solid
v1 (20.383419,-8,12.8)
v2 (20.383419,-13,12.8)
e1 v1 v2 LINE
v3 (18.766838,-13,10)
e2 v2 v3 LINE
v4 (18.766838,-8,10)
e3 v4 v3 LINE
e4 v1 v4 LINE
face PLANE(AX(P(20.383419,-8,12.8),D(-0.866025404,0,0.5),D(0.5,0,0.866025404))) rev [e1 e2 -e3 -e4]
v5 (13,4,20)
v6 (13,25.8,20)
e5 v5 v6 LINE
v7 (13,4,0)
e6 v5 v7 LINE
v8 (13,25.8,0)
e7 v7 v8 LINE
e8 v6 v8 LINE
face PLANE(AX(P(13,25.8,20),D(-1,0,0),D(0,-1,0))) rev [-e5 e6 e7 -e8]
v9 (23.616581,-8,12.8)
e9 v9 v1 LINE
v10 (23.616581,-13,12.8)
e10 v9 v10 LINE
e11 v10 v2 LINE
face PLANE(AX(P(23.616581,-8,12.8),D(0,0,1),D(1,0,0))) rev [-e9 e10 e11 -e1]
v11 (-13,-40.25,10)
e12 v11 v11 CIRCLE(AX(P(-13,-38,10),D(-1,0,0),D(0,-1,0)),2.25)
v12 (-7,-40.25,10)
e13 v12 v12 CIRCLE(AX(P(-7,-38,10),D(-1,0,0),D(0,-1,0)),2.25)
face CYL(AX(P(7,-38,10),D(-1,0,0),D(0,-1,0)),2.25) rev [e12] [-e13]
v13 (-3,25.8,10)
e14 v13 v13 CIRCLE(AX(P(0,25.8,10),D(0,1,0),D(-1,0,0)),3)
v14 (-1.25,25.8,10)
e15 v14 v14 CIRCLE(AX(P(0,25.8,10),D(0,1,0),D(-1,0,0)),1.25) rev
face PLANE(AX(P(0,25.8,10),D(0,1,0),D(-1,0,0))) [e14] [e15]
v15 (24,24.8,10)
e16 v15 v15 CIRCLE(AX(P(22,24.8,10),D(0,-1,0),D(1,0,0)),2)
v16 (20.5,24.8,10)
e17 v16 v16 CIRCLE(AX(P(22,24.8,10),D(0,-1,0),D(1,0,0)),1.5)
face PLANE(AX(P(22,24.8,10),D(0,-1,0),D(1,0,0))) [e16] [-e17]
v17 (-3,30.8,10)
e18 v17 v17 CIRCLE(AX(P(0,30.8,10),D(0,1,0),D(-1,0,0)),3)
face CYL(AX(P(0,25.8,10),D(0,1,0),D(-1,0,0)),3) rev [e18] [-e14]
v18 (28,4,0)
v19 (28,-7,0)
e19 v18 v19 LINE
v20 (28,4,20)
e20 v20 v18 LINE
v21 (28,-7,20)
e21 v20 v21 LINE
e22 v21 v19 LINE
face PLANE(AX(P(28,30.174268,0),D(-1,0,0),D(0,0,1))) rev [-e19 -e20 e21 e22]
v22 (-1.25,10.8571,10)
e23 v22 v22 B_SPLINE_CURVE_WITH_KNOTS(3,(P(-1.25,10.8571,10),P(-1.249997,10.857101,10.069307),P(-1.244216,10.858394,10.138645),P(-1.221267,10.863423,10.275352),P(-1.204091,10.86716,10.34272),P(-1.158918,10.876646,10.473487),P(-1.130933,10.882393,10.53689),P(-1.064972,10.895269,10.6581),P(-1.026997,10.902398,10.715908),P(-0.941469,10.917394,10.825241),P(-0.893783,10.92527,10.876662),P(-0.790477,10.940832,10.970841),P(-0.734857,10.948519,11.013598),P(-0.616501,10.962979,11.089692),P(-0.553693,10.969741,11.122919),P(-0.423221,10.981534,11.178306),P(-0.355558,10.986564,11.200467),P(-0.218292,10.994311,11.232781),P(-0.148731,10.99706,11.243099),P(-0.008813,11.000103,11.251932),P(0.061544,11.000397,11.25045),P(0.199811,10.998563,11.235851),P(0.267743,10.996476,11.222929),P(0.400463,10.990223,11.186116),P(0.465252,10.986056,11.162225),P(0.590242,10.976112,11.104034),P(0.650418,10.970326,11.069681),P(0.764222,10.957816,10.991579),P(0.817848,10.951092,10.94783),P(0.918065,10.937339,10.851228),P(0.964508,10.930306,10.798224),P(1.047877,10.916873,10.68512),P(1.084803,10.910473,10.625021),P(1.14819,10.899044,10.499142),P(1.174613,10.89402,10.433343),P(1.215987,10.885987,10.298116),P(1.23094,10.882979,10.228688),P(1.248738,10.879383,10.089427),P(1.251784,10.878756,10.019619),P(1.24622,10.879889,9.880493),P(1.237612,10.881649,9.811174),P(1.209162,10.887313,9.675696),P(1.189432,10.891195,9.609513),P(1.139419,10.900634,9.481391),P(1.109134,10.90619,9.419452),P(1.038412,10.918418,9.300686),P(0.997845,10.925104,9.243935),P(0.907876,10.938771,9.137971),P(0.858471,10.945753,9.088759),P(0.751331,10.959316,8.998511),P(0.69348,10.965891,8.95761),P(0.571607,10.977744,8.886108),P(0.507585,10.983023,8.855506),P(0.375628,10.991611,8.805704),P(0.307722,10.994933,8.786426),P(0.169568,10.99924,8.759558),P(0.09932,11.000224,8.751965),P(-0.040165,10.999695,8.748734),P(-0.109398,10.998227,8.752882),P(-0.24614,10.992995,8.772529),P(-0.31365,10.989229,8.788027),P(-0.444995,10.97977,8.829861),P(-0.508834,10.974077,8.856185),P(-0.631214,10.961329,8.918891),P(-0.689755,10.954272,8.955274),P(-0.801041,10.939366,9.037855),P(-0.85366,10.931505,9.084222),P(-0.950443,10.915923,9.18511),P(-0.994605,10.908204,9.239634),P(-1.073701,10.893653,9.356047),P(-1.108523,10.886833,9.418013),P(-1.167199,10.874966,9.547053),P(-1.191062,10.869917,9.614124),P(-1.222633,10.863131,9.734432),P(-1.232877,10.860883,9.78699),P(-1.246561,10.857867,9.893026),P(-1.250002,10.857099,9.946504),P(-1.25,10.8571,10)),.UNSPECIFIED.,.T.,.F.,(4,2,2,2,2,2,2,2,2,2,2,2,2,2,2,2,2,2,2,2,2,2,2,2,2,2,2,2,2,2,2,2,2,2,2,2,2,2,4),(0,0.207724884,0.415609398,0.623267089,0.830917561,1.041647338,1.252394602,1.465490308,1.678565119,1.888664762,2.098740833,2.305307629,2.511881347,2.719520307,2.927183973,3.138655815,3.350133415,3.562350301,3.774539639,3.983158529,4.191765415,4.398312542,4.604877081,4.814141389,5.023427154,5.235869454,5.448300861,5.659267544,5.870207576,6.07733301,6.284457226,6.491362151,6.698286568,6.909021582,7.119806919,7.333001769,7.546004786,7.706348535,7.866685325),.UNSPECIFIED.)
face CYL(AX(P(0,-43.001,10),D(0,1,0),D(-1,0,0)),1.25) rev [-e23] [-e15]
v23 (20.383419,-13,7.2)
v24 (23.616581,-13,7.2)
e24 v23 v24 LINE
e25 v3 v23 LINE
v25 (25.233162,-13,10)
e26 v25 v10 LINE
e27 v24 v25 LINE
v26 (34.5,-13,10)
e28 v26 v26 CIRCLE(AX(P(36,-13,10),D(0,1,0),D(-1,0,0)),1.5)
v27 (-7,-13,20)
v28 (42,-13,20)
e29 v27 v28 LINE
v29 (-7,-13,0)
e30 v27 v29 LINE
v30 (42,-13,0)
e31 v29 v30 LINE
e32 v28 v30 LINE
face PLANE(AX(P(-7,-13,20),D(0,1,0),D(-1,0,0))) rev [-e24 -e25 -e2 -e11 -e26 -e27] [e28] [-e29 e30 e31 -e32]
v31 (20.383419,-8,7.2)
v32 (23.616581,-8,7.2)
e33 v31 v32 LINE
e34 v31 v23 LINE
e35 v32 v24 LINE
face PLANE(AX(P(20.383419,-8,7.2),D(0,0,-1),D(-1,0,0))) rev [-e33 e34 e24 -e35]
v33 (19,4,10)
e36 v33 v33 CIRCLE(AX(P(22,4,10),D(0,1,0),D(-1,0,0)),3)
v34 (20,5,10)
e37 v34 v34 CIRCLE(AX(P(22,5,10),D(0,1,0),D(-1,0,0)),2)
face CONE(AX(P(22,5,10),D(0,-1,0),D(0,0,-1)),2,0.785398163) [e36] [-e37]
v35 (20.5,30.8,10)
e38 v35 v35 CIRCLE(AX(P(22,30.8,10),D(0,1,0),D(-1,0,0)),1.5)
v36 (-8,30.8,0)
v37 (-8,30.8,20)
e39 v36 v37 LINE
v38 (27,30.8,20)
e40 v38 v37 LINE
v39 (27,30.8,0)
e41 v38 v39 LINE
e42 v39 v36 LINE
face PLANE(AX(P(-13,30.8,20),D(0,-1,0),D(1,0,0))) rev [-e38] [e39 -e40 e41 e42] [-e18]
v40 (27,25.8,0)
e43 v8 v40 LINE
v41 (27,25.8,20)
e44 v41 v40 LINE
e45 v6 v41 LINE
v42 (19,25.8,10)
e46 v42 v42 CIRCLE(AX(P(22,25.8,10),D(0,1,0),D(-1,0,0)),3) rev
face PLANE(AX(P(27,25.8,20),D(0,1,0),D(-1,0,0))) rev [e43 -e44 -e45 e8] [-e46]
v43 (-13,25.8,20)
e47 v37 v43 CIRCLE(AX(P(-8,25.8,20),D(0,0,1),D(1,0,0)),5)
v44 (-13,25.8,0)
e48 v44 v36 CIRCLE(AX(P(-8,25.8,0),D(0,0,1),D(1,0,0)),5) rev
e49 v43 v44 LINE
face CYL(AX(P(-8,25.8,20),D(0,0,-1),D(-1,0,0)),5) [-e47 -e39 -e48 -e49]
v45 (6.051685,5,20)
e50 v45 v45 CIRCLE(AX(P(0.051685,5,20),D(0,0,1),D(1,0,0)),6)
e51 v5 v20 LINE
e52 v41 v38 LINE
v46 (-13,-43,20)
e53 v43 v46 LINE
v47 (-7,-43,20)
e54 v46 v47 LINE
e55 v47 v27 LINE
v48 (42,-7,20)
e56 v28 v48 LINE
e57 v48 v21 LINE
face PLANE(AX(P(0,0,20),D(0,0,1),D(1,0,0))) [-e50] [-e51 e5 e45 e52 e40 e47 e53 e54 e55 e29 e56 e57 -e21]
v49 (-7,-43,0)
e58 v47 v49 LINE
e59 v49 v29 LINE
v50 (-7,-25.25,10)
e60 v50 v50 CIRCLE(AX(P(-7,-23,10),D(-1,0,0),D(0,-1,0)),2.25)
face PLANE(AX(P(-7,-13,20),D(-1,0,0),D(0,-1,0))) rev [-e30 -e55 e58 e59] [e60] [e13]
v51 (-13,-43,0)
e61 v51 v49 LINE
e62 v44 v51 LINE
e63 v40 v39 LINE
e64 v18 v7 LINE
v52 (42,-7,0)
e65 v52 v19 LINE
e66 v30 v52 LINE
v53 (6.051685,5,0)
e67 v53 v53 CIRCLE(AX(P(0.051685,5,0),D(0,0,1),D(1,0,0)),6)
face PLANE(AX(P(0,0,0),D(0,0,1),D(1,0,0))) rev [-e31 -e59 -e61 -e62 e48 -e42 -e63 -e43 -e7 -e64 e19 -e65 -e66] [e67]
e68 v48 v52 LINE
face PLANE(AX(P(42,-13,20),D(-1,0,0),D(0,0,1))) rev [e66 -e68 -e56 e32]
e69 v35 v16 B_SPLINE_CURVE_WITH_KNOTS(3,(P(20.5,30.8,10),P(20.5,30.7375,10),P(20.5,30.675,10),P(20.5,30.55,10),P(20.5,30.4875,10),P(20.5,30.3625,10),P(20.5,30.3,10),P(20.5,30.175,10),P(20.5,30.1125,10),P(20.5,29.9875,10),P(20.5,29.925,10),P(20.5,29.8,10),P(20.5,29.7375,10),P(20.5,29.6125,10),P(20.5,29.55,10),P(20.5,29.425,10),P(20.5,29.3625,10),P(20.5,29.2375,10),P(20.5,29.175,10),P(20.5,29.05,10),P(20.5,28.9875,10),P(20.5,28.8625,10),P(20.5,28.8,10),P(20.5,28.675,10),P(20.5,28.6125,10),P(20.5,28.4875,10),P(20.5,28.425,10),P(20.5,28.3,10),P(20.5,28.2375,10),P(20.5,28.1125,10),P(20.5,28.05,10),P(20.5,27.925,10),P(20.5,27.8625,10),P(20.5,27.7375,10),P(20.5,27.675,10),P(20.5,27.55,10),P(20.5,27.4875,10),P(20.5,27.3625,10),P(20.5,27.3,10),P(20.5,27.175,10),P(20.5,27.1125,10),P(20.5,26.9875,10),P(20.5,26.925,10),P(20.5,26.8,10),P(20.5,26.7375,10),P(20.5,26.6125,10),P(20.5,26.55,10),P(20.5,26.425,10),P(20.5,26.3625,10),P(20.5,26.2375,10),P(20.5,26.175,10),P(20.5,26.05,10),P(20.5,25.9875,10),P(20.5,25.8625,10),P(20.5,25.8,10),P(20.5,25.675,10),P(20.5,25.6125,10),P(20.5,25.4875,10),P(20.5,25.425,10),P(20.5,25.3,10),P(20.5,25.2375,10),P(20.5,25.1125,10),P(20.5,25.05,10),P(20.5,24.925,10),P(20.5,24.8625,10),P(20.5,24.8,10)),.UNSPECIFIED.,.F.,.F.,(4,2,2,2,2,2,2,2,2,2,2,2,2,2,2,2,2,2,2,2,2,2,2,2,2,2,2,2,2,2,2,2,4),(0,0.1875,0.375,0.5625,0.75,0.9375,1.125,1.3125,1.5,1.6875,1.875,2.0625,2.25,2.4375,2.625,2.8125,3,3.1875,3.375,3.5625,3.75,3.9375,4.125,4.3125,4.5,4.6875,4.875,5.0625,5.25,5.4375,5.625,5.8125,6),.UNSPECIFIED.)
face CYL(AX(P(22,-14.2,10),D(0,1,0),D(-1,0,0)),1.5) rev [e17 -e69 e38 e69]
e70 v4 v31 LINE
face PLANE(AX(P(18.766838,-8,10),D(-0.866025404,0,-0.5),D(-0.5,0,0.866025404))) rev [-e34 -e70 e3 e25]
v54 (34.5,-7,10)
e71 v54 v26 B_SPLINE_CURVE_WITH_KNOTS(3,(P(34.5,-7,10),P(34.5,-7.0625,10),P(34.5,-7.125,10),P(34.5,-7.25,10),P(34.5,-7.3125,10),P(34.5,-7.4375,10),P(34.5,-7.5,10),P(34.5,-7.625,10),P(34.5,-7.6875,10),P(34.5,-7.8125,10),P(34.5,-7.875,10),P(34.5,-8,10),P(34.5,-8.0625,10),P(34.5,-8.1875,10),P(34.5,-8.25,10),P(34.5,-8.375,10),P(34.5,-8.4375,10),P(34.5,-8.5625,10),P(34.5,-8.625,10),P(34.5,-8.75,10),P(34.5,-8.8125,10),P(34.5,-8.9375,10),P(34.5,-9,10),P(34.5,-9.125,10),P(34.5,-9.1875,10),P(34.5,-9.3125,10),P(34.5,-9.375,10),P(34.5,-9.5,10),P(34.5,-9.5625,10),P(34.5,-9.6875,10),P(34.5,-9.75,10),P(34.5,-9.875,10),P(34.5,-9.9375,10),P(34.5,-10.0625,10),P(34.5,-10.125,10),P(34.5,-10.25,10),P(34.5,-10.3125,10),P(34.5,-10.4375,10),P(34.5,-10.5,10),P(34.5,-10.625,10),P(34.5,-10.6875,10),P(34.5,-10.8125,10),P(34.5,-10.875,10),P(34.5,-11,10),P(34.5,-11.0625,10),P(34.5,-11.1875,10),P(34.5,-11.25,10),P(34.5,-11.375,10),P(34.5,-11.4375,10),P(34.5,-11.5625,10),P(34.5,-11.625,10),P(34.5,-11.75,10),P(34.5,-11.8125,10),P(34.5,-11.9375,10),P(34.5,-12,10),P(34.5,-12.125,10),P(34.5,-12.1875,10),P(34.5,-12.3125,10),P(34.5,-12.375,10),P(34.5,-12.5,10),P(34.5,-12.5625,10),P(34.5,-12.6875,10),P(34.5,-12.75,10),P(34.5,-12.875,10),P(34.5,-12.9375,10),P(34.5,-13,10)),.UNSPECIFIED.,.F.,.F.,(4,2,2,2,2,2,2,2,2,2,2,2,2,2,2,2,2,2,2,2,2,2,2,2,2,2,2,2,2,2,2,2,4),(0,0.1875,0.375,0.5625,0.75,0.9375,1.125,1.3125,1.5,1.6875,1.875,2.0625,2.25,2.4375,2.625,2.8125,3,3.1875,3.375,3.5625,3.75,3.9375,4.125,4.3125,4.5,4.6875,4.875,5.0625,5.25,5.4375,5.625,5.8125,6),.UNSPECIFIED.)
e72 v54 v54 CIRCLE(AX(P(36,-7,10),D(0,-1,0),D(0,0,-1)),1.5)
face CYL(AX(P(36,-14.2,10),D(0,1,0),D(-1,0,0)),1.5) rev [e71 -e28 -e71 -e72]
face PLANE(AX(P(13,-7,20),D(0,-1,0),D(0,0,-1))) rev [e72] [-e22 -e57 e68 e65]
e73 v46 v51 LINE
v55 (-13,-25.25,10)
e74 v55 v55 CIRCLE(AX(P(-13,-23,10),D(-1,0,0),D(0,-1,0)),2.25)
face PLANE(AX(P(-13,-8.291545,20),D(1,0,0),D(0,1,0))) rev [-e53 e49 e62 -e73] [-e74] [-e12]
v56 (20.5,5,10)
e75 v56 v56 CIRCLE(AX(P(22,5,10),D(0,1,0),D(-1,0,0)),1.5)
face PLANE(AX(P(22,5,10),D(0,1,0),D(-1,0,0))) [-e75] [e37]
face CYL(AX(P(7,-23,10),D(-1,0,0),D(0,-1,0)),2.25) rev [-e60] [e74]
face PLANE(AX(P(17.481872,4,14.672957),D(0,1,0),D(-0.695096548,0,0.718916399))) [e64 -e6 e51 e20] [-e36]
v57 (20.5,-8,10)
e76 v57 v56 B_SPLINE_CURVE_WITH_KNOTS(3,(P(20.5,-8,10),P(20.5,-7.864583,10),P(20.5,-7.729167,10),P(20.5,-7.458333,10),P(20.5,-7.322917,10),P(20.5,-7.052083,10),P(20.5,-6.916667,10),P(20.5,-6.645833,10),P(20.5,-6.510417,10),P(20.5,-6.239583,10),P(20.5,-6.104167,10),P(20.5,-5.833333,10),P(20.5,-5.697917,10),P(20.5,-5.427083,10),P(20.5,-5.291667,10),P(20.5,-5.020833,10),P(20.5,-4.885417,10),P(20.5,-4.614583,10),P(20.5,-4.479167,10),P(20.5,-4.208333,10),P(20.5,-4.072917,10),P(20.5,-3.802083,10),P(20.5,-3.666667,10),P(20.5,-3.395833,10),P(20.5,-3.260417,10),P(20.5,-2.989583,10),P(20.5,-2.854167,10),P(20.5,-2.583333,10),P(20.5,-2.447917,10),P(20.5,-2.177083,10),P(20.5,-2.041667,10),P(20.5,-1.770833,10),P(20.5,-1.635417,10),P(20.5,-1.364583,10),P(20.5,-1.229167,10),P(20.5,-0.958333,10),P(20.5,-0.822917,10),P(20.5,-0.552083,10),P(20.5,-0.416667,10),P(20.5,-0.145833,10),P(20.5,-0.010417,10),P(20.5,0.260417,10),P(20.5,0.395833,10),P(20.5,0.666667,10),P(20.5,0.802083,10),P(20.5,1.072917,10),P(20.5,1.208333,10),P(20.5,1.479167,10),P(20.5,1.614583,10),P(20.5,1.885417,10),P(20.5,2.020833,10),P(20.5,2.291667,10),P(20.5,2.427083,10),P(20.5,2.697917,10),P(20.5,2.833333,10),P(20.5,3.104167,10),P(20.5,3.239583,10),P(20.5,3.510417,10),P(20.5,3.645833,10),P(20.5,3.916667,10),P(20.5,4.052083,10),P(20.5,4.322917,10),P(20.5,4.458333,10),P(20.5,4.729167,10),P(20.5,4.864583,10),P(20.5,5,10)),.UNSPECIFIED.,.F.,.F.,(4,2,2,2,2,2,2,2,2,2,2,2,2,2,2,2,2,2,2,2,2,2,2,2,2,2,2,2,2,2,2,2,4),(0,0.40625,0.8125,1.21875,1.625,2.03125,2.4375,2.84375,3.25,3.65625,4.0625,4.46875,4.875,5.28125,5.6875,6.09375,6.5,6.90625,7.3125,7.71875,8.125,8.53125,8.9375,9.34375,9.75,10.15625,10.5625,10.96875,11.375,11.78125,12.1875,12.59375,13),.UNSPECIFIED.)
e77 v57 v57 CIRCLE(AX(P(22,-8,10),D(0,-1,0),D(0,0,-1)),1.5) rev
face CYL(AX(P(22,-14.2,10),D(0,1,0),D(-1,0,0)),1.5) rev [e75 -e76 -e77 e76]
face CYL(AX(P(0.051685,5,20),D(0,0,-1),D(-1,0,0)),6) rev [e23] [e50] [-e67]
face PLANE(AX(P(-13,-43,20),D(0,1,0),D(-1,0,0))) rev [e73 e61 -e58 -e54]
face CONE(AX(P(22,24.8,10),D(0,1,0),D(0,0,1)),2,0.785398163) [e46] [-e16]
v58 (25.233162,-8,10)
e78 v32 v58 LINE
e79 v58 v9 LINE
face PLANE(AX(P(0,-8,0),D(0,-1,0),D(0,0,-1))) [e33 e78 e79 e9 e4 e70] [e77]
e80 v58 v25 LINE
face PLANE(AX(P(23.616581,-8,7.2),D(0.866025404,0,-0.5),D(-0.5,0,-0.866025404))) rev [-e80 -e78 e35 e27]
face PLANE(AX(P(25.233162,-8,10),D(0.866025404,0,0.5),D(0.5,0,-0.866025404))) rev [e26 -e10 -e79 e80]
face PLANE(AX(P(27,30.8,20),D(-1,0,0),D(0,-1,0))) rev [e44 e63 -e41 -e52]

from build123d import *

# Parameters (mm, degrees)
SKETCH1_R               = 6
BOSS_EXTRUDE1_DEPTH     = 20
SKETCH2_R               = 2.25
CUT_EXTRUDE1_DEPTH      = 20
SKETCH4_R               = 1.5
CUT_EXTRUDE2_DEPTH      = 45
BOSS_EXTRUDE2_START     = 11
SKETCH5_W               = 15.288681569
SKETCH5_H               = 20
SKETCH5_R               = 1.5
BOSS_EXTRUDE2_DEPTH     = 11
CUT_EXTRUDE3_REACH      = 89.238
CUT_EXTRUDE3_END_RADIUS = 6
SKETCH6_R               = 1.25
SKETCH7_R               = 3
CUT_EXTRUDE4_DEPTH      = 5
CUT_EXTRUDE5_DEPTH      = 5
FILLET1_R               = 5
BOSS_EXTRUDE3_START     = 1
SKETCH10_R              = 3
SKETCH10_R_2            = 1.5
BOSS_EXTRUDE3_DEPTH     = 1
CHAMFER1_SIZE           = 1
SKETCH11_R              = 3
SKETCH11_R_2            = 1.5
BOSS_EXTRUDE4_DEPTH     = 1
CHAMFER2_SIZE           = 1


with BuildPart() as part:
    # Sketch1 → Boss-Extrude1 (new body)
    with BuildSketch(Plane.XY):
        Polygon((27, 30.8), (27, 25.8), (13, 25.8), (13, -7), (42, -7), (42, -13), (-7, -13), (-7, -43), (-13, -43), (-13, -8.291544952), (-13, 30.8), align=None)
        with Locations((0.051684878, 5)):
            Circle(SKETCH1_R, mode=Mode.SUBTRACT)
    extrude(amount=BOSS_EXTRUDE1_DEPTH)

    # Sketch2 → Cut-Extrude1 (cut)
    with BuildSketch(Plane.ZY.offset(13)):
        with Locations(Location((10, -38, 0), (0, 0, 270))):
            Circle(SKETCH2_R)
        with Locations(Location((10, -23, 0), (0, 0, 270))):
            Circle(SKETCH2_R)
    extrude(amount=-CUT_EXTRUDE1_DEPTH, mode=Mode.SUBTRACT)

    # Sketch4 → Cut-Extrude2 (cut)
    with BuildSketch(Plane(origin=(0, 30.8, 0), x_dir=(1, 0, 0), z_dir=(0, 1, 0))):
        with Locations(Location((22, -10, 0), (0, 0, 180))):
            Circle(SKETCH4_R)
        with Locations(Location((36, -10, 0), (0, 0, 180))):
            Circle(SKETCH4_R)
    extrude(amount=-CUT_EXTRUDE2_DEPTH, mode=Mode.SUBTRACT)

    # Sketch5 → Boss-Extrude2 (add)
    with BuildSketch(Plane(origin=(0, -7, 0), x_dir=(1, 0, 0), z_dir=(0, 1, 0)).offset(BOSS_EXTRUDE2_START)):
        with Locations((20.355659216, -10)):
            Rectangle(SKETCH5_W, SKETCH5_H)
        with Locations(Location((22, -10, 0), (0, 0, 180))):
            Circle(SKETCH5_R, mode=Mode.SUBTRACT)
    extrude(amount=-BOSS_EXTRUDE2_DEPTH)

    # Cut-Extrude3: up to this cylinder (the profile starts outside it)
    cut_extrude3_end = Plane(origin=(0.051684878, 5, 10), z_dir=(0, 0, -1)) * Cylinder(CUT_EXTRUDE3_END_RADIUS, 191.476, mode=Mode.PRIVATE)
    # Sketch6 → Cut-Extrude3 (cut, up to the surface)
    with BuildSketch(Plane(origin=(0, 30.8, 0), x_dir=(1, 0, 0), z_dir=(0, 1, 0)), mode=Mode.PRIVATE) as cut_extrude3_sk1:
        with Locations(Location((0, -10, 0), (0, 0, 180))):
            Circle(SKETCH6_R)
    cut_extrude3_tool1 = extrude(cut_extrude3_sk1.sketch, amount=-CUT_EXTRUDE3_REACH, mode=Mode.PRIVATE) - cut_extrude3_end
    add(cut_extrude3_tool1.solids().sort_by_distance((0, 30.8, 10))[0], mode=Mode.SUBTRACT)

    # Sketch7 → Cut-Extrude4 (cut)
    with BuildSketch(Plane(origin=(0, 30.8, 0), x_dir=(1, 0, 0), z_dir=(0, 1, 0))):
        with Locations(Location((0, -10, 0), (0, 0, 180))):
            Circle(SKETCH7_R)
    extrude(amount=-CUT_EXTRUDE4_DEPTH, mode=Mode.SUBTRACT)

    # Sketch9 → Cut-Extrude5 (cut)
    with BuildSketch(Plane.XZ.offset(13)):
        Polygon((25.233161507, 10), (23.616580754, 12.8), (20.383419246, 12.8), (18.766838493, 10), (20.383419246, 7.2), (23.616580754, 7.2), align=None)
    extrude(amount=-CUT_EXTRUDE5_DEPTH, mode=Mode.SUBTRACT)

    # Fillet1
    fillet1_edges = [part.edges().sort_by_distance(p)[0] for p in [
        (-13, 30.8, 10),
    ]]
    fillet(fillet1_edges, radius=FILLET1_R)

    # Sketch10 → Boss-Extrude3 (add)
    with BuildSketch(Plane(origin=(0, 4, 0), x_dir=(1, 0, 0), z_dir=(0, 1, 0)).offset(BOSS_EXTRUDE3_START)):
        with Locations(Location((22, -10, 0), (0, 0, 180))):
            Circle(SKETCH10_R)
        with Locations(Location((22, -10, 0), (0, 0, 180))):
            Circle(SKETCH10_R_2, mode=Mode.SUBTRACT)
    extrude(amount=-BOSS_EXTRUDE3_DEPTH)

    # Chamfer1
    chamfer1_edges = [part.edges().sort_by_distance(p)[0] for p in [
        (25, 5, 10),
    ]]
    chamfer(chamfer1_edges, length=CHAMFER1_SIZE - 0.0001)  # a hair under: the kernel refuses the full size

    # Sketch11 → Boss-Extrude4 (add)
    with BuildSketch(Plane.XZ.offset(-25.8)):
        with Locations(Location((22, 10, 0), (0, 0, 180))):
            Circle(SKETCH11_R)
        with Locations(Location((22, 10, 0), (0, 0, 180))):
            Circle(SKETCH11_R_2, mode=Mode.SUBTRACT)
    extrude(amount=BOSS_EXTRUDE4_DEPTH)

    # Chamfer2
    chamfer2_edges = [part.edges().sort_by_distance(p)[0] for p in [
        (25, 24.8, 10),
    ]]
    chamfer(chamfer2_edges, length=CHAMFER2_SIZE - 0.0001)  # a hair under: the kernel refuses the full size


solid = part.part
